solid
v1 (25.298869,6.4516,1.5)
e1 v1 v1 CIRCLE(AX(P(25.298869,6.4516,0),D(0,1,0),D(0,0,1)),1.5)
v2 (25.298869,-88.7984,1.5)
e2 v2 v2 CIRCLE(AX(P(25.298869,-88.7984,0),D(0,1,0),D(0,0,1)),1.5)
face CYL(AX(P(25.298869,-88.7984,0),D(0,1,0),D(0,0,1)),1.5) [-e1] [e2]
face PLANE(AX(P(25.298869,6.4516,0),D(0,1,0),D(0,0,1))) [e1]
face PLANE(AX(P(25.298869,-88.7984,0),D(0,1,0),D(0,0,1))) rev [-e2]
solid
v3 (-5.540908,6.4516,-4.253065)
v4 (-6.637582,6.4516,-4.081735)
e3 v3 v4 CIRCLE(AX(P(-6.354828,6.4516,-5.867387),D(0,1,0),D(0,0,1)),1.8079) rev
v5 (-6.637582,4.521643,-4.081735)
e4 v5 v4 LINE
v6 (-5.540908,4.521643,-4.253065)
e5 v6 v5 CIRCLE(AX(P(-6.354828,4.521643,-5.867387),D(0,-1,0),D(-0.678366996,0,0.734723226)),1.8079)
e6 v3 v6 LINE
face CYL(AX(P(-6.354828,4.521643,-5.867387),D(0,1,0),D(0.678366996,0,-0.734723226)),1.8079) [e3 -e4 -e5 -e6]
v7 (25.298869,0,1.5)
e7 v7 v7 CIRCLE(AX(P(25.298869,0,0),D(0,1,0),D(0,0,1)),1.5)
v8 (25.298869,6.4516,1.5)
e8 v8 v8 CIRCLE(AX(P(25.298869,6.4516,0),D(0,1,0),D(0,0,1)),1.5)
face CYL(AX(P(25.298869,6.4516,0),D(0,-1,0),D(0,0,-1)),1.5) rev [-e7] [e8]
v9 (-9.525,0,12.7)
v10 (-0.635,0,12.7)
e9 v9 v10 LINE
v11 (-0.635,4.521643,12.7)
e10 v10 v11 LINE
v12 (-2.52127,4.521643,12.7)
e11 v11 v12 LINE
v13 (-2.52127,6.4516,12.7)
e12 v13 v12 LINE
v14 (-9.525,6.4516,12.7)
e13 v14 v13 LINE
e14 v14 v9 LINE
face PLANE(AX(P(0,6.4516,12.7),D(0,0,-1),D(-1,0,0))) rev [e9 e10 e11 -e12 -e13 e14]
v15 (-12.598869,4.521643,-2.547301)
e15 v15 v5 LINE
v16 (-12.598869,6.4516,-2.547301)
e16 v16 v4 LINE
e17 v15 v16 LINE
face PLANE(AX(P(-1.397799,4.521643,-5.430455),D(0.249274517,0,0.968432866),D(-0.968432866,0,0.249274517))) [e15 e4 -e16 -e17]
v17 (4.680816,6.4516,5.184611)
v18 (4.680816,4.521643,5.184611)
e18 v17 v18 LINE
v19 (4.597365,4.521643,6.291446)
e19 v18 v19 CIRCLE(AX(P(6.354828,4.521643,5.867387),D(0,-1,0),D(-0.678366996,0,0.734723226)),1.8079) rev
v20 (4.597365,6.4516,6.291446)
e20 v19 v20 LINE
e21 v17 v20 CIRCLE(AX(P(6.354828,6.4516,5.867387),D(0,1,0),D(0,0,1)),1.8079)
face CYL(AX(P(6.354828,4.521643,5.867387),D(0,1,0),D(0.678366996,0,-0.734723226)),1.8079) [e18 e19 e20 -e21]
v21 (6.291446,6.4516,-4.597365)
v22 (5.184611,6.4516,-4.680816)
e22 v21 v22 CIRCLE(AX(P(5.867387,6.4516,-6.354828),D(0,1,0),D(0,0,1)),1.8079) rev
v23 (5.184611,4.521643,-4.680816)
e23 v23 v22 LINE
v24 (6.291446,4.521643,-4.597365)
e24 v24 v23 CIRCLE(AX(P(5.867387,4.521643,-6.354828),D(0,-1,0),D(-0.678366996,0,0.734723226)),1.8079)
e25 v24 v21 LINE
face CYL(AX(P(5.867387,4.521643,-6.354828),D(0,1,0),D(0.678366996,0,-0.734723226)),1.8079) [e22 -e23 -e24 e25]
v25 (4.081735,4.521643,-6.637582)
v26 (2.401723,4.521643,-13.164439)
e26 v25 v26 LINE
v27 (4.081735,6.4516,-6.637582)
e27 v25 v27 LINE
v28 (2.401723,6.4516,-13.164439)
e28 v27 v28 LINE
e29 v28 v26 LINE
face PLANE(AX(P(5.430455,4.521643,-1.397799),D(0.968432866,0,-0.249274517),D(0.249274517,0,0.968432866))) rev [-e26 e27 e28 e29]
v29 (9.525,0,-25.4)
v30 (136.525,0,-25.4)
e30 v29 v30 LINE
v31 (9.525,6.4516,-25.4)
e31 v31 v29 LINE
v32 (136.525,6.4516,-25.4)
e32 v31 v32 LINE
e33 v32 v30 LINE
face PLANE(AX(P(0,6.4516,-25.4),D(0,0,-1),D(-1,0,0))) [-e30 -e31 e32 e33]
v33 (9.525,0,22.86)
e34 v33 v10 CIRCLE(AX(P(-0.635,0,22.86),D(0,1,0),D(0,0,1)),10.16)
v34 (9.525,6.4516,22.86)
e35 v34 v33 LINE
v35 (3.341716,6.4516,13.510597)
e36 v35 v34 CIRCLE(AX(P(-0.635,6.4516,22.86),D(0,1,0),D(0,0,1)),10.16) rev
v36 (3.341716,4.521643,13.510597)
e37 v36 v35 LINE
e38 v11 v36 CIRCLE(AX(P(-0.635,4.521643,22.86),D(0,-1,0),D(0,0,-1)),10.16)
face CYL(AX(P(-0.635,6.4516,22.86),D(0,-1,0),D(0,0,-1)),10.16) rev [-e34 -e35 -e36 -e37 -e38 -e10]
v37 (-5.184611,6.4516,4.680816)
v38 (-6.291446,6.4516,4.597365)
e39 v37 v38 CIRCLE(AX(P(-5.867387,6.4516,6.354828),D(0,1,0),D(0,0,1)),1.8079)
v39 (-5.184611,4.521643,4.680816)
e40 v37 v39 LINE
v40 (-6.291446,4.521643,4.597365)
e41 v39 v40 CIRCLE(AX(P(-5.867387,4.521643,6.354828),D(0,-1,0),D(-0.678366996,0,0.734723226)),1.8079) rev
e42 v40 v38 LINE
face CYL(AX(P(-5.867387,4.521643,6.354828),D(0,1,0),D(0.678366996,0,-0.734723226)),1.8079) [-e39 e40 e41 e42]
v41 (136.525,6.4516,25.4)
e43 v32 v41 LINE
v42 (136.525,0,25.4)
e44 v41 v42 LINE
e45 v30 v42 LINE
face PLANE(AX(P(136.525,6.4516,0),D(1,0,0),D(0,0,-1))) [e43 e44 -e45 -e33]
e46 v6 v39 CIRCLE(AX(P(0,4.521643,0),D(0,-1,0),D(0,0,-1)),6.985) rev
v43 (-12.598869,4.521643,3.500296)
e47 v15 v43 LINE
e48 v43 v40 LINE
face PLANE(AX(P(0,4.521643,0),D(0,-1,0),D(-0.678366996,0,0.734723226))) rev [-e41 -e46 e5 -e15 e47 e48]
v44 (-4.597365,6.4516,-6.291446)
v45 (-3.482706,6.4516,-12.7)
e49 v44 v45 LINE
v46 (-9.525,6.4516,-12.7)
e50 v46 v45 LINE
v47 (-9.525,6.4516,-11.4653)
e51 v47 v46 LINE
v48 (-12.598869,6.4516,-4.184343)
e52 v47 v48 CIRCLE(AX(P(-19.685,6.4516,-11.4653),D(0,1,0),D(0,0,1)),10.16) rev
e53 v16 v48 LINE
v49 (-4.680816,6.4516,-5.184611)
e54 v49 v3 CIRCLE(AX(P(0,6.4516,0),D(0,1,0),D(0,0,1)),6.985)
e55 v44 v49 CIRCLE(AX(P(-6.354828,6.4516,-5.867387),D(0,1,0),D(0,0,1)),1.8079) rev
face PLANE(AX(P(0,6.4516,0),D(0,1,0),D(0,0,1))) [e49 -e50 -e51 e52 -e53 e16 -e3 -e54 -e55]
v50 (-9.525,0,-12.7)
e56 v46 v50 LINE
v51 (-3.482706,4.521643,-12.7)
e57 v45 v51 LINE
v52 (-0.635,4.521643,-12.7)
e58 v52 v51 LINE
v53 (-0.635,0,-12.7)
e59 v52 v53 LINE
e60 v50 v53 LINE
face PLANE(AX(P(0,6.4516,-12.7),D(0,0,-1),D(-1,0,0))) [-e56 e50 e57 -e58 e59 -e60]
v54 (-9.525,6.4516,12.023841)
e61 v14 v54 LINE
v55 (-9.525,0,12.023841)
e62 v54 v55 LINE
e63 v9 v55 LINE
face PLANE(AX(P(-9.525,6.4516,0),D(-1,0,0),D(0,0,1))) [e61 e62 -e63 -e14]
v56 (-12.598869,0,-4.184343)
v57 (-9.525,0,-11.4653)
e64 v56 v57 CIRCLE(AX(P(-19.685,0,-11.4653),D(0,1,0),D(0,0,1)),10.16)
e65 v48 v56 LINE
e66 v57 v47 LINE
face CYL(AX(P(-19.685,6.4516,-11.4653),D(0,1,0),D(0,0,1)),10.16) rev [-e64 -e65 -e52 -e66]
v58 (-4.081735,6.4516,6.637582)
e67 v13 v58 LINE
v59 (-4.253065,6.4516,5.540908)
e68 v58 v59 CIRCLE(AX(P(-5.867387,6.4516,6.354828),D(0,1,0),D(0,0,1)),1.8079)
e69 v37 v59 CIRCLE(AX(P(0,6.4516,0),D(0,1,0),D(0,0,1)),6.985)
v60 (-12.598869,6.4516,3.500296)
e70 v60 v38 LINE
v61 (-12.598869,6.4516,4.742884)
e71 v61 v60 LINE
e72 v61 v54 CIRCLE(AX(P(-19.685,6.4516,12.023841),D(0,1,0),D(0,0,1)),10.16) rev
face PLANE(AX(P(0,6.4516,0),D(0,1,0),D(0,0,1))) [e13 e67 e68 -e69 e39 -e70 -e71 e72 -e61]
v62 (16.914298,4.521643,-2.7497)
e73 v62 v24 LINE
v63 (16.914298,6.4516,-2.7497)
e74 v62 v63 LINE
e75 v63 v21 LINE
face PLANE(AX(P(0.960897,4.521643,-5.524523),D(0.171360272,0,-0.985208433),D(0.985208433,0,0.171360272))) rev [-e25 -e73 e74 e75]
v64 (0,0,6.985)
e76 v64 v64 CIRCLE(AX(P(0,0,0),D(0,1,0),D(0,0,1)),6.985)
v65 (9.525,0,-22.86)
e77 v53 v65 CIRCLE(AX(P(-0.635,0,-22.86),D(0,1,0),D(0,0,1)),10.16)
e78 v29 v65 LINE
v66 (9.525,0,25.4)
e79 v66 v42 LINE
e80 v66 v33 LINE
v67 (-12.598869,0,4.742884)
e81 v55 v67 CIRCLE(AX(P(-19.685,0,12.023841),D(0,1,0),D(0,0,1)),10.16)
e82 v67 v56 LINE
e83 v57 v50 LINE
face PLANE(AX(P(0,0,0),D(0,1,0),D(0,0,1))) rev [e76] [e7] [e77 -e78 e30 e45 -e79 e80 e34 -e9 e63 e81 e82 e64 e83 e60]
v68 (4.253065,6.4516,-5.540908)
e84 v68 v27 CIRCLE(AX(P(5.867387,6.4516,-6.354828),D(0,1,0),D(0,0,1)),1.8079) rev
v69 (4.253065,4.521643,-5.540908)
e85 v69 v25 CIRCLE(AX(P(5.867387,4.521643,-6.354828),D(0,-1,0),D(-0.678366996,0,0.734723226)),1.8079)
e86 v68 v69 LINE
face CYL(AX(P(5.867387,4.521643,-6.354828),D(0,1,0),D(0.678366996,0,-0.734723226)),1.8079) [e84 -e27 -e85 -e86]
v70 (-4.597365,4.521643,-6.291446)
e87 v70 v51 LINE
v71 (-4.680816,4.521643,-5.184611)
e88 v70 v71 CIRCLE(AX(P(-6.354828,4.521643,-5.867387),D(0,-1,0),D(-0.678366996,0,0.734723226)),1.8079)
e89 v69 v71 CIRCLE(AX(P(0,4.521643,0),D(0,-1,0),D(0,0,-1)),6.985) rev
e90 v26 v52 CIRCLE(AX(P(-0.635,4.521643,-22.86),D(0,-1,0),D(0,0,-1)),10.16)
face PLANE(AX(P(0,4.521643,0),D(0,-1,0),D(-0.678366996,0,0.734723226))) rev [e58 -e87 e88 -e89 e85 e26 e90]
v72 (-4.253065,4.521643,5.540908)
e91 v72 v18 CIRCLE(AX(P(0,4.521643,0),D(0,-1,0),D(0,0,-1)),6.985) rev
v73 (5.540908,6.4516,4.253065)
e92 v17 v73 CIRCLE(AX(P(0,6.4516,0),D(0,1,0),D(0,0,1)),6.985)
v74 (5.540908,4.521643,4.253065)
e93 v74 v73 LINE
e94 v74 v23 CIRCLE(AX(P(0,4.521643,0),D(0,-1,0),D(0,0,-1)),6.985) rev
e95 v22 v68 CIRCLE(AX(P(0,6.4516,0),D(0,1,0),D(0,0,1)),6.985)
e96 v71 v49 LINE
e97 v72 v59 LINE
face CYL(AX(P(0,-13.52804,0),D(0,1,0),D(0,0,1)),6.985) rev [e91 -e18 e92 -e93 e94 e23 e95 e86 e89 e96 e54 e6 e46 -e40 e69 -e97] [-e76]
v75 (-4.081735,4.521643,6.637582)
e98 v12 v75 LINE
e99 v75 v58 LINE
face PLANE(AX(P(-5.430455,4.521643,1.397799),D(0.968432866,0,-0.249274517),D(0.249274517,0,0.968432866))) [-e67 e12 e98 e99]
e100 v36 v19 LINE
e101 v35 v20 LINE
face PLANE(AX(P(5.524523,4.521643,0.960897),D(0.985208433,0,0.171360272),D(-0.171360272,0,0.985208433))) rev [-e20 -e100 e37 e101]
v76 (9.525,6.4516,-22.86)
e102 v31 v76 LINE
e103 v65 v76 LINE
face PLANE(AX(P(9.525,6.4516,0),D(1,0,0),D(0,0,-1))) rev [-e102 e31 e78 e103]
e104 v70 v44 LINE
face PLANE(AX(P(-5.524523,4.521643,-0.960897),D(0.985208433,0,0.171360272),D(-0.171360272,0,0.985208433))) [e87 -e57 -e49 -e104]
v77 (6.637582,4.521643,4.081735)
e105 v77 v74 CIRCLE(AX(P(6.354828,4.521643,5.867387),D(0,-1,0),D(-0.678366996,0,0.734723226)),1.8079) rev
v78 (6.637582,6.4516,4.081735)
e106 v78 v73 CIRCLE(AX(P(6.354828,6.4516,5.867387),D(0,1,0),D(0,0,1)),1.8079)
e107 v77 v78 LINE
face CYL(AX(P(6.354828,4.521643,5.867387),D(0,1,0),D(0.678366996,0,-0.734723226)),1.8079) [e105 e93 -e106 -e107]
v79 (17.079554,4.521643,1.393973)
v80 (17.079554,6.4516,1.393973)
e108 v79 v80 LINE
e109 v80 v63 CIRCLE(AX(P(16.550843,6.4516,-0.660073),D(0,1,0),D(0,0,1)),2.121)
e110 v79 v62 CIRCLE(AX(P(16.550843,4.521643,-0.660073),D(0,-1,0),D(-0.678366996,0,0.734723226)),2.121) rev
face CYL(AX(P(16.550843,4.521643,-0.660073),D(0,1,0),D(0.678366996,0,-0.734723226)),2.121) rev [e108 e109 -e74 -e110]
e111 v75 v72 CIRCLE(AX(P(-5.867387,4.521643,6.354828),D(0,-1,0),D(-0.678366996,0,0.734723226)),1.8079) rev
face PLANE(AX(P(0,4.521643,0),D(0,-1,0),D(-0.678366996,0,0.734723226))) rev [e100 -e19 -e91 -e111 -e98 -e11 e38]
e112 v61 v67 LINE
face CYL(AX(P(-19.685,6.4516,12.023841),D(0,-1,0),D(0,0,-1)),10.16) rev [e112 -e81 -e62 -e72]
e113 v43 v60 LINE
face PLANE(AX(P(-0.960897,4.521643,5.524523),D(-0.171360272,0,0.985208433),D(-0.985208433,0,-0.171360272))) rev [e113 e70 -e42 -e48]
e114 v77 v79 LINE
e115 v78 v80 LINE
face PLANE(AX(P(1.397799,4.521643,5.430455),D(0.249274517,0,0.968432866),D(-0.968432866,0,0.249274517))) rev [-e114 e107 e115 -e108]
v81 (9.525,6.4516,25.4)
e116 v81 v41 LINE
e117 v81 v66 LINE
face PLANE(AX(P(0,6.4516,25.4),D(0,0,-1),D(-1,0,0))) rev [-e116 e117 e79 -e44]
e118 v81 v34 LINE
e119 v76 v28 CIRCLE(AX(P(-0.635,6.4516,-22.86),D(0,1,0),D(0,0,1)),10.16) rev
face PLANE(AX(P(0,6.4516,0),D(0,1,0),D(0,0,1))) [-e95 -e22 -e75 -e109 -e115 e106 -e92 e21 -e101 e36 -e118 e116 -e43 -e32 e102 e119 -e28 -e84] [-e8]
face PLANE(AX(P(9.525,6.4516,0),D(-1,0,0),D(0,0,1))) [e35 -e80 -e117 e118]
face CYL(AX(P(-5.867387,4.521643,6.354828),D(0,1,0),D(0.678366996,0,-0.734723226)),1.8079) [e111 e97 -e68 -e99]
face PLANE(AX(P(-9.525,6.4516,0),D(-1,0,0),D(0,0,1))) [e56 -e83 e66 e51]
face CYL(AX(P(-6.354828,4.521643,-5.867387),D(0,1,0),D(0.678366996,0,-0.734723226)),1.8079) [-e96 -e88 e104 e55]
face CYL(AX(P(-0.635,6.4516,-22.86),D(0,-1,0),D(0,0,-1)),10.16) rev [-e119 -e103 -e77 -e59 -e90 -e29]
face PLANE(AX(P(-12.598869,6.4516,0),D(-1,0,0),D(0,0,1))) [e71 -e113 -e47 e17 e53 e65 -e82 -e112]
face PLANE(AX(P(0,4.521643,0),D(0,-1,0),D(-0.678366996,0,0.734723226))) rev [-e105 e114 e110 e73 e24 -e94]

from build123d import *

# Parameters (mm, degrees)
SKETCH1_R           = 1.5
BOSS_EXTRUDE1_DEPTH = 6.4516
SKETCH2_3_R         = 6.985
CUT_EXTRUDE2_DEPTH  = 19.97964
CAVITY1_START       = 4.521642996
CAVITY1_OUTLINE_R   = 0.7575
CAVITY1_DEPTH       = 1.929957004
SKETCH3_R           = 0.7575
CUT_EXTRUDE3_DEPTH  = 139.94128573
SKETCH4_R           = 1.5
BOSS_EXTRUDE2_DEPTH = 95.25
FILLET1_R           = 10.16


with BuildPart() as part:
    # Sketch1 → Boss-Extrude1 (new body)
    with BuildSketch(Plane(origin=(0, 0, 0), x_dir=(1, 0, 0), z_dir=(0, 1, 0))):
        Polygon((-12.598868717, 4.18434255), (-12.598868717, -4.742883604), (-9.525, -5.534097084), (-9.525, -12.7), (9.525, -12.7), (9.525, -25.4), (136.525, -25.4), (136.525, 25.4), (9.525, 25.4), (9.525, 12.7), (-9.525, 12.7), (-9.525, 4.975556031), align=None)
        with Locations(Location((25.298868717, 0, 0), (0, 0, 270))):
            Circle(SKETCH1_R, mode=Mode.SUBTRACT)
    extrude(amount=BOSS_EXTRUDE1_DEPTH)

    # Sketch2<3> → Cut-Extrude2 (cut)
    with BuildSketch(Plane(origin=(0, 6.4516, 0), x_dir=(1, 0, 0), z_dir=(0, 1, 0))):
        with Locations(Location((0, 0, 0), (0, 0, 270))):
            Circle(SKETCH2_3_R)
    extrude(amount=-CUT_EXTRUDE2_DEPTH, mode=Mode.SUBTRACT)

    # Cavity1: read off the stored shape, not the designer's step
    # Cavity1 outline → Cavity1 (cut)
    # profile 1 of 4: a face of its own
    with BuildSketch(Plane(origin=(0, 0, 0), x_dir=(1, 0, 0), z_dir=(0, 1, 0)).offset(CAVITY1_START)):
        with BuildLine():
            ThreePointArc((-0.835841276, 6.934810333), (-0.328024221, 8.224961542), (0.280923041, 6.979348626))
            ThreePointArc((0.280923041, 6.979348626), (2.378348231, 6.567623976), (4.253065237, 5.540907966))
            ThreePointArc((4.253065237, 5.540907966), (4.081154126, 6.075770836), (4.081735433, 6.637581642))
            Line((4.081735433, 6.637581642), (2.521269592, 12.7))
            Line((2.521269592, 12.7), (-3.482705917, 12.7))
            Line((-3.482705917, 12.7), (-4.59736509, 6.291445655))
            ThreePointArc((-4.59736509, 6.291445655), (-4.552045019, 5.731465467), (-4.680815563, 5.184610947))
            ThreePointArc((-4.680815563, 5.184610947), (-2.893816709, 6.357361863), (-0.835841276, 6.934810333))
        make_face()
        with Locations((-0.418583054, 10.495656446)):
            Circle(CAVITY1_OUTLINE_R, mode=Mode.SUBTRACT)
    # profile 2 of 4: a face of its own
    with BuildSketch(Plane(origin=(0, 0, 0), x_dir=(1, 0, 0), z_dir=(0, 1, 0)).offset(CAVITY1_START)):
        with BuildLine():
            ThreePointArc((6.291445655, 4.59736509), (5.731465467, 4.552045019), (5.184610947, 4.680815563))
            ThreePointArc((5.184610947, 4.680815563), (6.357361863, 2.893816709), (6.934810333, 0.835841276))
            ThreePointArc((6.934810333, 0.835841276), (8.224961542, 0.328024221), (6.979348626, -0.280923041))
            ThreePointArc((6.979348626, -0.280923041), (6.567623976, -2.378348231), (5.540907966, -4.253065237))
            ThreePointArc((5.540907966, -4.253065237), (6.075770836, -4.081154126), (6.637581642, -4.081735433))
            Line((6.637581642, -4.081735433), (17.079554107, -1.39397283))
            ThreePointArc((17.079554107, -1.39397283), (18.670158101, 0.744594857), (16.914297994, 2.749700365))
            Line((16.914297994, 2.749700365), (6.291445655, 4.59736509))
        make_face()
        with Locations((10.495656446, 0.418583054)):
            Circle(CAVITY1_OUTLINE_R, mode=Mode.SUBTRACT)
        with Locations((13.523249651, 0.539328166)):
            Circle(CAVITY1_OUTLINE_R, mode=Mode.SUBTRACT)
        with Locations((16.550842857, 0.660073278)):
            Circle(CAVITY1_OUTLINE_R, mode=Mode.SUBTRACT)
    # profile 3 of 4: a face of its own
    with BuildSketch(Plane(origin=(0, 0, 0), x_dir=(1, 0, 0), z_dir=(0, 1, 0)).offset(CAVITY1_START)):
        with BuildLine():
            ThreePointArc((-6.979348626, 0.280923041), (-6.567623976, 2.378348231), (-5.540907966, 4.253065237))
            ThreePointArc((-5.540907966, 4.253065237), (-6.075770836, 4.081154126), (-6.637581642, 4.081735433))
            Line((-6.637581642, 4.081735433), (-12.598868717, 2.547300773))
            Line((-12.598868717, 2.547300773), (-12.598868717, -3.500295986))
            Line((-12.598868717, -3.500295986), (-6.291445655, -4.59736509))
            ThreePointArc((-6.291445655, -4.59736509), (-5.731465467, -4.552045019), (-5.184610947, -4.680815563))
            ThreePointArc((-5.184610947, -4.680815563), (-6.357361863, -2.893816709), (-6.934810333, -0.835841276))
            ThreePointArc((-6.934810333, -0.835841276), (-8.224961542, -0.328024221), (-6.979348626, 0.280923041))
        make_face()
        with Locations((-10.495656446, -0.418583054)):
            Circle(CAVITY1_OUTLINE_R, mode=Mode.SUBTRACT)
    # profile 4 of 4: a face of its own
    with BuildSketch(Plane(origin=(0, 0, 0), x_dir=(1, 0, 0), z_dir=(0, 1, 0)).offset(CAVITY1_START)):
        with BuildLine():
            ThreePointArc((4.59736509, -6.291445655), (4.552045019, -5.731465467), (4.680815563, -5.184610947))
            ThreePointArc((4.680815563, -5.184610947), (2.893816709, -6.357361863), (0.835841276, -6.934810333))
            ThreePointArc((0.835841276, -6.934810333), (0.328024221, -8.224961542), (-0.280923041, -6.979348626))
            ThreePointArc((-0.280923041, -6.979348626), (-2.378348231, -6.567623976), (-4.253065237, -5.540907966))
            ThreePointArc((-4.253065237, -5.540907966), (-4.081154126, -6.075770836), (-4.081735433, -6.637581642))
            Line((-4.081735433, -6.637581642), (-2.521269592, -12.7))
            Line((-2.521269592, -12.7), (3.482705917, -12.7))
            Line((3.482705917, -12.7), (4.59736509, -6.291445655))
        make_face()
        with Locations((0.418583054, -10.495656446)):
            Circle(CAVITY1_OUTLINE_R, mode=Mode.SUBTRACT)
    extrude(amount=CAVITY1_DEPTH, mode=Mode.SUBTRACT)

    # Sketch3 → Cut-Extrude3 (cut, through all)
    with BuildSketch(Plane(origin=(0, 4.521642996, 0), x_dir=(1, 0, 0), z_dir=(0, 1, 0))):
        with Locations((0.418583054, -10.495656446)):
            Circle(SKETCH3_R)
        with Locations((16.550842857, 0.660073278)):
            Circle(SKETCH3_R)
        with Locations((13.523249651, 0.539328166)):
            Circle(SKETCH3_R)
        with Locations((10.495656446, 0.418583054)):
            Circle(SKETCH3_R)
        with Locations((-0.418583054, 10.495656446)):
            Circle(SKETCH3_R)
        with Locations((-10.495656446, -0.418583054)):
            Circle(SKETCH3_R)
        with BuildLine():
            Line((-6.979348626, 0.280923041), (-6.934810333, -0.835841276))
            ThreePointArc((-6.934810333, -0.835841276), (-8.224961542, -0.32802422), (-6.979348626, 0.280923041))
        make_face()
        with BuildLine():
            Line((-0.835841276, 6.934810333), (0.280923041, 6.979348626))
            ThreePointArc((0.280923041, 6.979348626), (-0.32802422, 8.224961542), (-0.835841276, 6.934810333))
        make_face()
        with BuildLine():
            Line((6.934810333, 0.835841276), (6.979348626, -0.280923041))
            ThreePointArc((6.979348626, -0.280923041), (8.224961542, 0.32802422), (6.934810333, 0.835841276))
        make_face()
        with BuildLine():
            Line((-0.280923041, -6.979348626), (0.835841276, -6.934810333))
            ThreePointArc((0.835841276, -6.934810333), (0.32802422, -8.224961542), (-0.280923041, -6.979348626))
        make_face()
    extrude(amount=CUT_EXTRUDE3_DEPTH, mode=Mode.SUBTRACT)

    # Fillet1
    # the kernel refuses this fillet: 10.16 mm, written as the material it adds along each edge
    with BuildSketch(Plane(origin=(-9.525, 0, -4.975556031), x_dir=(0, 0, -1), z_dir=(0, 1, 0))) as fillet1_piece_1:
        with BuildLine():
            CenterArc((6.48974411, 10.16), FILLET1_R, 224.223082624, 45.776917376)
            Line((-0.791213481, 3.073868717), (0, 0))
            Line((0, 0), (6.48974411, 0))
        make_face()
    extrude(amount=6.4516)
    with BuildSketch(Plane(origin=(-9.525, 0, 5.534097084), x_dir=(0, 0, 1), z_dir=(0, 1, 0))) as fillet1_piece_2:
        with BuildLine():
            CenterArc((6.48974411, -10.16), FILLET1_R, 90, 45.776917376)
            Line((-0.791213481, -3.073868717), (0, 0))
            Line((0, 0), (6.48974411, 0))
        make_face()
    extrude(amount=6.4516)
    with BuildSketch(Plane(origin=(9.525, 0, 12.7), x_dir=(0, 0, 1), z_dir=(0, 1, 0))) as fillet1_piece_3_section:
        with BuildLine():
            CenterArc((FILLET1_R, -FILLET1_R), FILLET1_R, 90, 90)
            Line((0, -FILLET1_R), (0, 0))
            Line((0, 0), (FILLET1_R, 0))
        make_face()
    fillet1_piece_3 = extrude(amount=6.4516, mode=Mode.PRIVATE)
    fillet1_piece_3 = split(fillet1_piece_3, bisect_by=Plane(origin=(3.660133912, 0, 11.679906164), z_dir=(0.9852084333186758, 0, 0.17136027228549955)), keep=Keep.TOP, mode=Mode.PRIVATE)
    fillet1_piece_3 = split(fillet1_piece_3, bisect_by=Plane(origin=(9.525, 4.521642996, 12.7), z_dir=(0, -1, 0)), keep=Keep.TOP, mode=Mode.PRIVATE)
    add(fillet1_piece_3)
    with BuildSketch(Plane(origin=(9.525, 0, 12.7), x_dir=(0, 0, 1), z_dir=(0, 1, 0))) as fillet1_piece_4_section:
        with BuildLine():
            CenterArc((FILLET1_R, -FILLET1_R), FILLET1_R, 90, 90)
            Line((0, -FILLET1_R), (0, 0))
            Line((0, 0), (FILLET1_R, 0))
        make_face()
    fillet1_piece_4 = extrude(amount=6.4516, mode=Mode.PRIVATE)
    fillet1_piece_4 = split(fillet1_piece_4, bisect_by=Plane(origin=(3.660133912, 0, 11.679906164), z_dir=(-0.9852084333186758, 0, -0.17136027228549955)), keep=Keep.TOP, mode=Mode.PRIVATE)
    fillet1_piece_4 = split(fillet1_piece_4, bisect_by=Plane(origin=(9.525, 4.521642996, 12.7), z_dir=(0, -1, 0)), keep=Keep.TOP, mode=Mode.PRIVATE)
    add(fillet1_piece_4)
    with BuildSketch(Plane(origin=(9.525, 0, 12.7), x_dir=(0, 0, 1), z_dir=(0, 1, 0))) as fillet1_piece_5_section:
        with BuildLine():
            CenterArc((FILLET1_R, -FILLET1_R), FILLET1_R, 90, 90)
            Line((0, -FILLET1_R), (0, 0))
            Line((0, 0), (FILLET1_R, 0))
        make_face()
    fillet1_piece_5 = extrude(amount=6.4516, mode=Mode.PRIVATE)
    fillet1_piece_5 = split(fillet1_piece_5, bisect_by=Plane(origin=(3.660133912, 0, 11.679906164), z_dir=(0.9852084333186758, 0, 0.17136027228549955)), keep=Keep.TOP, mode=Mode.PRIVATE)
    fillet1_piece_5 = split(fillet1_piece_5, bisect_by=Plane(origin=(9.525, 4.521642996, 12.7), z_dir=(0, 1, 0)), keep=Keep.TOP, mode=Mode.PRIVATE)
    add(fillet1_piece_5)
    with BuildSketch(Plane(origin=(9.525, 0, -12.7), x_dir=(0, 0, -1), z_dir=(0, 1, 0))) as fillet1_piece_6_section:
        with BuildLine():
            CenterArc((FILLET1_R, FILLET1_R), FILLET1_R, 180, 90)
            Line((0, FILLET1_R), (0, 0))
            Line((0, 0), (FILLET1_R, 0))
        make_face()
    fillet1_piece_6 = extrude(amount=6.4516, mode=Mode.PRIVATE)
    fillet1_piece_6 = split(fillet1_piece_6, bisect_by=Plane(origin=(9.525, 4.521642996, -12.7), z_dir=(0, -1, 0)), keep=Keep.TOP, mode=Mode.PRIVATE)
    fillet1_piece_6 = split(fillet1_piece_6, bisect_by=Plane(origin=(2.956465884, 0, -11.009260017), z_dir=(0.9684328656786102, 0, -0.24927451669497816)), keep=Keep.TOP, mode=Mode.PRIVATE)
    add(fillet1_piece_6)
    with BuildSketch(Plane(origin=(9.525, 0, -12.7), x_dir=(0, 0, -1), z_dir=(0, 1, 0))) as fillet1_piece_7_section:
        with BuildLine():
            CenterArc((FILLET1_R, FILLET1_R), FILLET1_R, 180, 90)
            Line((0, FILLET1_R), (0, 0))
            Line((0, 0), (FILLET1_R, 0))
        make_face()
    fillet1_piece_7 = extrude(amount=6.4516, mode=Mode.PRIVATE)
    fillet1_piece_7 = split(fillet1_piece_7, bisect_by=Plane(origin=(9.525, 4.521642996, -12.7), z_dir=(0, -1, 0)), keep=Keep.TOP, mode=Mode.PRIVATE)
    fillet1_piece_7 = split(fillet1_piece_7, bisect_by=Plane(origin=(2.956465884, 0, -11.009260017), z_dir=(-0.9684328656786102, 0, 0.24927451669497816)), keep=Keep.TOP, mode=Mode.PRIVATE)
    add(fillet1_piece_7)
    with BuildSketch(Plane(origin=(9.525, 0, -12.7), x_dir=(0, 0, -1), z_dir=(0, 1, 0))) as fillet1_piece_8_section:
        with BuildLine():
            CenterArc((FILLET1_R, FILLET1_R), FILLET1_R, 180, 90)
            Line((0, FILLET1_R), (0, 0))
            Line((0, 0), (FILLET1_R, 0))
        make_face()
    fillet1_piece_8 = extrude(amount=6.4516, mode=Mode.PRIVATE)
    fillet1_piece_8 = split(fillet1_piece_8, bisect_by=Plane(origin=(9.525, 4.521642996, -12.7), z_dir=(0, 1, 0)), keep=Keep.TOP, mode=Mode.PRIVATE)
    fillet1_piece_8 = split(fillet1_piece_8, bisect_by=Plane(origin=(2.956465884, 0, -11.009260017), z_dir=(0.9684328656786102, 0, -0.24927451669497816)), keep=Keep.TOP, mode=Mode.PRIVATE)
    add(fillet1_piece_8)


with BuildPart() as body_2:
    # Sketch4 → Boss-Extrude2 (new body)
    with BuildSketch(Plane(origin=(0, 6.4516, 0), x_dir=(1, 0, 0), z_dir=(0, 1, 0))):
        with Locations(Location((25.298868717, 0, 0), (0, 0, 270))):
            Circle(SKETCH4_R)
    extrude(amount=-BOSS_EXTRUDE2_DEPTH)


solid = Compound([part.part, body_2.part])
